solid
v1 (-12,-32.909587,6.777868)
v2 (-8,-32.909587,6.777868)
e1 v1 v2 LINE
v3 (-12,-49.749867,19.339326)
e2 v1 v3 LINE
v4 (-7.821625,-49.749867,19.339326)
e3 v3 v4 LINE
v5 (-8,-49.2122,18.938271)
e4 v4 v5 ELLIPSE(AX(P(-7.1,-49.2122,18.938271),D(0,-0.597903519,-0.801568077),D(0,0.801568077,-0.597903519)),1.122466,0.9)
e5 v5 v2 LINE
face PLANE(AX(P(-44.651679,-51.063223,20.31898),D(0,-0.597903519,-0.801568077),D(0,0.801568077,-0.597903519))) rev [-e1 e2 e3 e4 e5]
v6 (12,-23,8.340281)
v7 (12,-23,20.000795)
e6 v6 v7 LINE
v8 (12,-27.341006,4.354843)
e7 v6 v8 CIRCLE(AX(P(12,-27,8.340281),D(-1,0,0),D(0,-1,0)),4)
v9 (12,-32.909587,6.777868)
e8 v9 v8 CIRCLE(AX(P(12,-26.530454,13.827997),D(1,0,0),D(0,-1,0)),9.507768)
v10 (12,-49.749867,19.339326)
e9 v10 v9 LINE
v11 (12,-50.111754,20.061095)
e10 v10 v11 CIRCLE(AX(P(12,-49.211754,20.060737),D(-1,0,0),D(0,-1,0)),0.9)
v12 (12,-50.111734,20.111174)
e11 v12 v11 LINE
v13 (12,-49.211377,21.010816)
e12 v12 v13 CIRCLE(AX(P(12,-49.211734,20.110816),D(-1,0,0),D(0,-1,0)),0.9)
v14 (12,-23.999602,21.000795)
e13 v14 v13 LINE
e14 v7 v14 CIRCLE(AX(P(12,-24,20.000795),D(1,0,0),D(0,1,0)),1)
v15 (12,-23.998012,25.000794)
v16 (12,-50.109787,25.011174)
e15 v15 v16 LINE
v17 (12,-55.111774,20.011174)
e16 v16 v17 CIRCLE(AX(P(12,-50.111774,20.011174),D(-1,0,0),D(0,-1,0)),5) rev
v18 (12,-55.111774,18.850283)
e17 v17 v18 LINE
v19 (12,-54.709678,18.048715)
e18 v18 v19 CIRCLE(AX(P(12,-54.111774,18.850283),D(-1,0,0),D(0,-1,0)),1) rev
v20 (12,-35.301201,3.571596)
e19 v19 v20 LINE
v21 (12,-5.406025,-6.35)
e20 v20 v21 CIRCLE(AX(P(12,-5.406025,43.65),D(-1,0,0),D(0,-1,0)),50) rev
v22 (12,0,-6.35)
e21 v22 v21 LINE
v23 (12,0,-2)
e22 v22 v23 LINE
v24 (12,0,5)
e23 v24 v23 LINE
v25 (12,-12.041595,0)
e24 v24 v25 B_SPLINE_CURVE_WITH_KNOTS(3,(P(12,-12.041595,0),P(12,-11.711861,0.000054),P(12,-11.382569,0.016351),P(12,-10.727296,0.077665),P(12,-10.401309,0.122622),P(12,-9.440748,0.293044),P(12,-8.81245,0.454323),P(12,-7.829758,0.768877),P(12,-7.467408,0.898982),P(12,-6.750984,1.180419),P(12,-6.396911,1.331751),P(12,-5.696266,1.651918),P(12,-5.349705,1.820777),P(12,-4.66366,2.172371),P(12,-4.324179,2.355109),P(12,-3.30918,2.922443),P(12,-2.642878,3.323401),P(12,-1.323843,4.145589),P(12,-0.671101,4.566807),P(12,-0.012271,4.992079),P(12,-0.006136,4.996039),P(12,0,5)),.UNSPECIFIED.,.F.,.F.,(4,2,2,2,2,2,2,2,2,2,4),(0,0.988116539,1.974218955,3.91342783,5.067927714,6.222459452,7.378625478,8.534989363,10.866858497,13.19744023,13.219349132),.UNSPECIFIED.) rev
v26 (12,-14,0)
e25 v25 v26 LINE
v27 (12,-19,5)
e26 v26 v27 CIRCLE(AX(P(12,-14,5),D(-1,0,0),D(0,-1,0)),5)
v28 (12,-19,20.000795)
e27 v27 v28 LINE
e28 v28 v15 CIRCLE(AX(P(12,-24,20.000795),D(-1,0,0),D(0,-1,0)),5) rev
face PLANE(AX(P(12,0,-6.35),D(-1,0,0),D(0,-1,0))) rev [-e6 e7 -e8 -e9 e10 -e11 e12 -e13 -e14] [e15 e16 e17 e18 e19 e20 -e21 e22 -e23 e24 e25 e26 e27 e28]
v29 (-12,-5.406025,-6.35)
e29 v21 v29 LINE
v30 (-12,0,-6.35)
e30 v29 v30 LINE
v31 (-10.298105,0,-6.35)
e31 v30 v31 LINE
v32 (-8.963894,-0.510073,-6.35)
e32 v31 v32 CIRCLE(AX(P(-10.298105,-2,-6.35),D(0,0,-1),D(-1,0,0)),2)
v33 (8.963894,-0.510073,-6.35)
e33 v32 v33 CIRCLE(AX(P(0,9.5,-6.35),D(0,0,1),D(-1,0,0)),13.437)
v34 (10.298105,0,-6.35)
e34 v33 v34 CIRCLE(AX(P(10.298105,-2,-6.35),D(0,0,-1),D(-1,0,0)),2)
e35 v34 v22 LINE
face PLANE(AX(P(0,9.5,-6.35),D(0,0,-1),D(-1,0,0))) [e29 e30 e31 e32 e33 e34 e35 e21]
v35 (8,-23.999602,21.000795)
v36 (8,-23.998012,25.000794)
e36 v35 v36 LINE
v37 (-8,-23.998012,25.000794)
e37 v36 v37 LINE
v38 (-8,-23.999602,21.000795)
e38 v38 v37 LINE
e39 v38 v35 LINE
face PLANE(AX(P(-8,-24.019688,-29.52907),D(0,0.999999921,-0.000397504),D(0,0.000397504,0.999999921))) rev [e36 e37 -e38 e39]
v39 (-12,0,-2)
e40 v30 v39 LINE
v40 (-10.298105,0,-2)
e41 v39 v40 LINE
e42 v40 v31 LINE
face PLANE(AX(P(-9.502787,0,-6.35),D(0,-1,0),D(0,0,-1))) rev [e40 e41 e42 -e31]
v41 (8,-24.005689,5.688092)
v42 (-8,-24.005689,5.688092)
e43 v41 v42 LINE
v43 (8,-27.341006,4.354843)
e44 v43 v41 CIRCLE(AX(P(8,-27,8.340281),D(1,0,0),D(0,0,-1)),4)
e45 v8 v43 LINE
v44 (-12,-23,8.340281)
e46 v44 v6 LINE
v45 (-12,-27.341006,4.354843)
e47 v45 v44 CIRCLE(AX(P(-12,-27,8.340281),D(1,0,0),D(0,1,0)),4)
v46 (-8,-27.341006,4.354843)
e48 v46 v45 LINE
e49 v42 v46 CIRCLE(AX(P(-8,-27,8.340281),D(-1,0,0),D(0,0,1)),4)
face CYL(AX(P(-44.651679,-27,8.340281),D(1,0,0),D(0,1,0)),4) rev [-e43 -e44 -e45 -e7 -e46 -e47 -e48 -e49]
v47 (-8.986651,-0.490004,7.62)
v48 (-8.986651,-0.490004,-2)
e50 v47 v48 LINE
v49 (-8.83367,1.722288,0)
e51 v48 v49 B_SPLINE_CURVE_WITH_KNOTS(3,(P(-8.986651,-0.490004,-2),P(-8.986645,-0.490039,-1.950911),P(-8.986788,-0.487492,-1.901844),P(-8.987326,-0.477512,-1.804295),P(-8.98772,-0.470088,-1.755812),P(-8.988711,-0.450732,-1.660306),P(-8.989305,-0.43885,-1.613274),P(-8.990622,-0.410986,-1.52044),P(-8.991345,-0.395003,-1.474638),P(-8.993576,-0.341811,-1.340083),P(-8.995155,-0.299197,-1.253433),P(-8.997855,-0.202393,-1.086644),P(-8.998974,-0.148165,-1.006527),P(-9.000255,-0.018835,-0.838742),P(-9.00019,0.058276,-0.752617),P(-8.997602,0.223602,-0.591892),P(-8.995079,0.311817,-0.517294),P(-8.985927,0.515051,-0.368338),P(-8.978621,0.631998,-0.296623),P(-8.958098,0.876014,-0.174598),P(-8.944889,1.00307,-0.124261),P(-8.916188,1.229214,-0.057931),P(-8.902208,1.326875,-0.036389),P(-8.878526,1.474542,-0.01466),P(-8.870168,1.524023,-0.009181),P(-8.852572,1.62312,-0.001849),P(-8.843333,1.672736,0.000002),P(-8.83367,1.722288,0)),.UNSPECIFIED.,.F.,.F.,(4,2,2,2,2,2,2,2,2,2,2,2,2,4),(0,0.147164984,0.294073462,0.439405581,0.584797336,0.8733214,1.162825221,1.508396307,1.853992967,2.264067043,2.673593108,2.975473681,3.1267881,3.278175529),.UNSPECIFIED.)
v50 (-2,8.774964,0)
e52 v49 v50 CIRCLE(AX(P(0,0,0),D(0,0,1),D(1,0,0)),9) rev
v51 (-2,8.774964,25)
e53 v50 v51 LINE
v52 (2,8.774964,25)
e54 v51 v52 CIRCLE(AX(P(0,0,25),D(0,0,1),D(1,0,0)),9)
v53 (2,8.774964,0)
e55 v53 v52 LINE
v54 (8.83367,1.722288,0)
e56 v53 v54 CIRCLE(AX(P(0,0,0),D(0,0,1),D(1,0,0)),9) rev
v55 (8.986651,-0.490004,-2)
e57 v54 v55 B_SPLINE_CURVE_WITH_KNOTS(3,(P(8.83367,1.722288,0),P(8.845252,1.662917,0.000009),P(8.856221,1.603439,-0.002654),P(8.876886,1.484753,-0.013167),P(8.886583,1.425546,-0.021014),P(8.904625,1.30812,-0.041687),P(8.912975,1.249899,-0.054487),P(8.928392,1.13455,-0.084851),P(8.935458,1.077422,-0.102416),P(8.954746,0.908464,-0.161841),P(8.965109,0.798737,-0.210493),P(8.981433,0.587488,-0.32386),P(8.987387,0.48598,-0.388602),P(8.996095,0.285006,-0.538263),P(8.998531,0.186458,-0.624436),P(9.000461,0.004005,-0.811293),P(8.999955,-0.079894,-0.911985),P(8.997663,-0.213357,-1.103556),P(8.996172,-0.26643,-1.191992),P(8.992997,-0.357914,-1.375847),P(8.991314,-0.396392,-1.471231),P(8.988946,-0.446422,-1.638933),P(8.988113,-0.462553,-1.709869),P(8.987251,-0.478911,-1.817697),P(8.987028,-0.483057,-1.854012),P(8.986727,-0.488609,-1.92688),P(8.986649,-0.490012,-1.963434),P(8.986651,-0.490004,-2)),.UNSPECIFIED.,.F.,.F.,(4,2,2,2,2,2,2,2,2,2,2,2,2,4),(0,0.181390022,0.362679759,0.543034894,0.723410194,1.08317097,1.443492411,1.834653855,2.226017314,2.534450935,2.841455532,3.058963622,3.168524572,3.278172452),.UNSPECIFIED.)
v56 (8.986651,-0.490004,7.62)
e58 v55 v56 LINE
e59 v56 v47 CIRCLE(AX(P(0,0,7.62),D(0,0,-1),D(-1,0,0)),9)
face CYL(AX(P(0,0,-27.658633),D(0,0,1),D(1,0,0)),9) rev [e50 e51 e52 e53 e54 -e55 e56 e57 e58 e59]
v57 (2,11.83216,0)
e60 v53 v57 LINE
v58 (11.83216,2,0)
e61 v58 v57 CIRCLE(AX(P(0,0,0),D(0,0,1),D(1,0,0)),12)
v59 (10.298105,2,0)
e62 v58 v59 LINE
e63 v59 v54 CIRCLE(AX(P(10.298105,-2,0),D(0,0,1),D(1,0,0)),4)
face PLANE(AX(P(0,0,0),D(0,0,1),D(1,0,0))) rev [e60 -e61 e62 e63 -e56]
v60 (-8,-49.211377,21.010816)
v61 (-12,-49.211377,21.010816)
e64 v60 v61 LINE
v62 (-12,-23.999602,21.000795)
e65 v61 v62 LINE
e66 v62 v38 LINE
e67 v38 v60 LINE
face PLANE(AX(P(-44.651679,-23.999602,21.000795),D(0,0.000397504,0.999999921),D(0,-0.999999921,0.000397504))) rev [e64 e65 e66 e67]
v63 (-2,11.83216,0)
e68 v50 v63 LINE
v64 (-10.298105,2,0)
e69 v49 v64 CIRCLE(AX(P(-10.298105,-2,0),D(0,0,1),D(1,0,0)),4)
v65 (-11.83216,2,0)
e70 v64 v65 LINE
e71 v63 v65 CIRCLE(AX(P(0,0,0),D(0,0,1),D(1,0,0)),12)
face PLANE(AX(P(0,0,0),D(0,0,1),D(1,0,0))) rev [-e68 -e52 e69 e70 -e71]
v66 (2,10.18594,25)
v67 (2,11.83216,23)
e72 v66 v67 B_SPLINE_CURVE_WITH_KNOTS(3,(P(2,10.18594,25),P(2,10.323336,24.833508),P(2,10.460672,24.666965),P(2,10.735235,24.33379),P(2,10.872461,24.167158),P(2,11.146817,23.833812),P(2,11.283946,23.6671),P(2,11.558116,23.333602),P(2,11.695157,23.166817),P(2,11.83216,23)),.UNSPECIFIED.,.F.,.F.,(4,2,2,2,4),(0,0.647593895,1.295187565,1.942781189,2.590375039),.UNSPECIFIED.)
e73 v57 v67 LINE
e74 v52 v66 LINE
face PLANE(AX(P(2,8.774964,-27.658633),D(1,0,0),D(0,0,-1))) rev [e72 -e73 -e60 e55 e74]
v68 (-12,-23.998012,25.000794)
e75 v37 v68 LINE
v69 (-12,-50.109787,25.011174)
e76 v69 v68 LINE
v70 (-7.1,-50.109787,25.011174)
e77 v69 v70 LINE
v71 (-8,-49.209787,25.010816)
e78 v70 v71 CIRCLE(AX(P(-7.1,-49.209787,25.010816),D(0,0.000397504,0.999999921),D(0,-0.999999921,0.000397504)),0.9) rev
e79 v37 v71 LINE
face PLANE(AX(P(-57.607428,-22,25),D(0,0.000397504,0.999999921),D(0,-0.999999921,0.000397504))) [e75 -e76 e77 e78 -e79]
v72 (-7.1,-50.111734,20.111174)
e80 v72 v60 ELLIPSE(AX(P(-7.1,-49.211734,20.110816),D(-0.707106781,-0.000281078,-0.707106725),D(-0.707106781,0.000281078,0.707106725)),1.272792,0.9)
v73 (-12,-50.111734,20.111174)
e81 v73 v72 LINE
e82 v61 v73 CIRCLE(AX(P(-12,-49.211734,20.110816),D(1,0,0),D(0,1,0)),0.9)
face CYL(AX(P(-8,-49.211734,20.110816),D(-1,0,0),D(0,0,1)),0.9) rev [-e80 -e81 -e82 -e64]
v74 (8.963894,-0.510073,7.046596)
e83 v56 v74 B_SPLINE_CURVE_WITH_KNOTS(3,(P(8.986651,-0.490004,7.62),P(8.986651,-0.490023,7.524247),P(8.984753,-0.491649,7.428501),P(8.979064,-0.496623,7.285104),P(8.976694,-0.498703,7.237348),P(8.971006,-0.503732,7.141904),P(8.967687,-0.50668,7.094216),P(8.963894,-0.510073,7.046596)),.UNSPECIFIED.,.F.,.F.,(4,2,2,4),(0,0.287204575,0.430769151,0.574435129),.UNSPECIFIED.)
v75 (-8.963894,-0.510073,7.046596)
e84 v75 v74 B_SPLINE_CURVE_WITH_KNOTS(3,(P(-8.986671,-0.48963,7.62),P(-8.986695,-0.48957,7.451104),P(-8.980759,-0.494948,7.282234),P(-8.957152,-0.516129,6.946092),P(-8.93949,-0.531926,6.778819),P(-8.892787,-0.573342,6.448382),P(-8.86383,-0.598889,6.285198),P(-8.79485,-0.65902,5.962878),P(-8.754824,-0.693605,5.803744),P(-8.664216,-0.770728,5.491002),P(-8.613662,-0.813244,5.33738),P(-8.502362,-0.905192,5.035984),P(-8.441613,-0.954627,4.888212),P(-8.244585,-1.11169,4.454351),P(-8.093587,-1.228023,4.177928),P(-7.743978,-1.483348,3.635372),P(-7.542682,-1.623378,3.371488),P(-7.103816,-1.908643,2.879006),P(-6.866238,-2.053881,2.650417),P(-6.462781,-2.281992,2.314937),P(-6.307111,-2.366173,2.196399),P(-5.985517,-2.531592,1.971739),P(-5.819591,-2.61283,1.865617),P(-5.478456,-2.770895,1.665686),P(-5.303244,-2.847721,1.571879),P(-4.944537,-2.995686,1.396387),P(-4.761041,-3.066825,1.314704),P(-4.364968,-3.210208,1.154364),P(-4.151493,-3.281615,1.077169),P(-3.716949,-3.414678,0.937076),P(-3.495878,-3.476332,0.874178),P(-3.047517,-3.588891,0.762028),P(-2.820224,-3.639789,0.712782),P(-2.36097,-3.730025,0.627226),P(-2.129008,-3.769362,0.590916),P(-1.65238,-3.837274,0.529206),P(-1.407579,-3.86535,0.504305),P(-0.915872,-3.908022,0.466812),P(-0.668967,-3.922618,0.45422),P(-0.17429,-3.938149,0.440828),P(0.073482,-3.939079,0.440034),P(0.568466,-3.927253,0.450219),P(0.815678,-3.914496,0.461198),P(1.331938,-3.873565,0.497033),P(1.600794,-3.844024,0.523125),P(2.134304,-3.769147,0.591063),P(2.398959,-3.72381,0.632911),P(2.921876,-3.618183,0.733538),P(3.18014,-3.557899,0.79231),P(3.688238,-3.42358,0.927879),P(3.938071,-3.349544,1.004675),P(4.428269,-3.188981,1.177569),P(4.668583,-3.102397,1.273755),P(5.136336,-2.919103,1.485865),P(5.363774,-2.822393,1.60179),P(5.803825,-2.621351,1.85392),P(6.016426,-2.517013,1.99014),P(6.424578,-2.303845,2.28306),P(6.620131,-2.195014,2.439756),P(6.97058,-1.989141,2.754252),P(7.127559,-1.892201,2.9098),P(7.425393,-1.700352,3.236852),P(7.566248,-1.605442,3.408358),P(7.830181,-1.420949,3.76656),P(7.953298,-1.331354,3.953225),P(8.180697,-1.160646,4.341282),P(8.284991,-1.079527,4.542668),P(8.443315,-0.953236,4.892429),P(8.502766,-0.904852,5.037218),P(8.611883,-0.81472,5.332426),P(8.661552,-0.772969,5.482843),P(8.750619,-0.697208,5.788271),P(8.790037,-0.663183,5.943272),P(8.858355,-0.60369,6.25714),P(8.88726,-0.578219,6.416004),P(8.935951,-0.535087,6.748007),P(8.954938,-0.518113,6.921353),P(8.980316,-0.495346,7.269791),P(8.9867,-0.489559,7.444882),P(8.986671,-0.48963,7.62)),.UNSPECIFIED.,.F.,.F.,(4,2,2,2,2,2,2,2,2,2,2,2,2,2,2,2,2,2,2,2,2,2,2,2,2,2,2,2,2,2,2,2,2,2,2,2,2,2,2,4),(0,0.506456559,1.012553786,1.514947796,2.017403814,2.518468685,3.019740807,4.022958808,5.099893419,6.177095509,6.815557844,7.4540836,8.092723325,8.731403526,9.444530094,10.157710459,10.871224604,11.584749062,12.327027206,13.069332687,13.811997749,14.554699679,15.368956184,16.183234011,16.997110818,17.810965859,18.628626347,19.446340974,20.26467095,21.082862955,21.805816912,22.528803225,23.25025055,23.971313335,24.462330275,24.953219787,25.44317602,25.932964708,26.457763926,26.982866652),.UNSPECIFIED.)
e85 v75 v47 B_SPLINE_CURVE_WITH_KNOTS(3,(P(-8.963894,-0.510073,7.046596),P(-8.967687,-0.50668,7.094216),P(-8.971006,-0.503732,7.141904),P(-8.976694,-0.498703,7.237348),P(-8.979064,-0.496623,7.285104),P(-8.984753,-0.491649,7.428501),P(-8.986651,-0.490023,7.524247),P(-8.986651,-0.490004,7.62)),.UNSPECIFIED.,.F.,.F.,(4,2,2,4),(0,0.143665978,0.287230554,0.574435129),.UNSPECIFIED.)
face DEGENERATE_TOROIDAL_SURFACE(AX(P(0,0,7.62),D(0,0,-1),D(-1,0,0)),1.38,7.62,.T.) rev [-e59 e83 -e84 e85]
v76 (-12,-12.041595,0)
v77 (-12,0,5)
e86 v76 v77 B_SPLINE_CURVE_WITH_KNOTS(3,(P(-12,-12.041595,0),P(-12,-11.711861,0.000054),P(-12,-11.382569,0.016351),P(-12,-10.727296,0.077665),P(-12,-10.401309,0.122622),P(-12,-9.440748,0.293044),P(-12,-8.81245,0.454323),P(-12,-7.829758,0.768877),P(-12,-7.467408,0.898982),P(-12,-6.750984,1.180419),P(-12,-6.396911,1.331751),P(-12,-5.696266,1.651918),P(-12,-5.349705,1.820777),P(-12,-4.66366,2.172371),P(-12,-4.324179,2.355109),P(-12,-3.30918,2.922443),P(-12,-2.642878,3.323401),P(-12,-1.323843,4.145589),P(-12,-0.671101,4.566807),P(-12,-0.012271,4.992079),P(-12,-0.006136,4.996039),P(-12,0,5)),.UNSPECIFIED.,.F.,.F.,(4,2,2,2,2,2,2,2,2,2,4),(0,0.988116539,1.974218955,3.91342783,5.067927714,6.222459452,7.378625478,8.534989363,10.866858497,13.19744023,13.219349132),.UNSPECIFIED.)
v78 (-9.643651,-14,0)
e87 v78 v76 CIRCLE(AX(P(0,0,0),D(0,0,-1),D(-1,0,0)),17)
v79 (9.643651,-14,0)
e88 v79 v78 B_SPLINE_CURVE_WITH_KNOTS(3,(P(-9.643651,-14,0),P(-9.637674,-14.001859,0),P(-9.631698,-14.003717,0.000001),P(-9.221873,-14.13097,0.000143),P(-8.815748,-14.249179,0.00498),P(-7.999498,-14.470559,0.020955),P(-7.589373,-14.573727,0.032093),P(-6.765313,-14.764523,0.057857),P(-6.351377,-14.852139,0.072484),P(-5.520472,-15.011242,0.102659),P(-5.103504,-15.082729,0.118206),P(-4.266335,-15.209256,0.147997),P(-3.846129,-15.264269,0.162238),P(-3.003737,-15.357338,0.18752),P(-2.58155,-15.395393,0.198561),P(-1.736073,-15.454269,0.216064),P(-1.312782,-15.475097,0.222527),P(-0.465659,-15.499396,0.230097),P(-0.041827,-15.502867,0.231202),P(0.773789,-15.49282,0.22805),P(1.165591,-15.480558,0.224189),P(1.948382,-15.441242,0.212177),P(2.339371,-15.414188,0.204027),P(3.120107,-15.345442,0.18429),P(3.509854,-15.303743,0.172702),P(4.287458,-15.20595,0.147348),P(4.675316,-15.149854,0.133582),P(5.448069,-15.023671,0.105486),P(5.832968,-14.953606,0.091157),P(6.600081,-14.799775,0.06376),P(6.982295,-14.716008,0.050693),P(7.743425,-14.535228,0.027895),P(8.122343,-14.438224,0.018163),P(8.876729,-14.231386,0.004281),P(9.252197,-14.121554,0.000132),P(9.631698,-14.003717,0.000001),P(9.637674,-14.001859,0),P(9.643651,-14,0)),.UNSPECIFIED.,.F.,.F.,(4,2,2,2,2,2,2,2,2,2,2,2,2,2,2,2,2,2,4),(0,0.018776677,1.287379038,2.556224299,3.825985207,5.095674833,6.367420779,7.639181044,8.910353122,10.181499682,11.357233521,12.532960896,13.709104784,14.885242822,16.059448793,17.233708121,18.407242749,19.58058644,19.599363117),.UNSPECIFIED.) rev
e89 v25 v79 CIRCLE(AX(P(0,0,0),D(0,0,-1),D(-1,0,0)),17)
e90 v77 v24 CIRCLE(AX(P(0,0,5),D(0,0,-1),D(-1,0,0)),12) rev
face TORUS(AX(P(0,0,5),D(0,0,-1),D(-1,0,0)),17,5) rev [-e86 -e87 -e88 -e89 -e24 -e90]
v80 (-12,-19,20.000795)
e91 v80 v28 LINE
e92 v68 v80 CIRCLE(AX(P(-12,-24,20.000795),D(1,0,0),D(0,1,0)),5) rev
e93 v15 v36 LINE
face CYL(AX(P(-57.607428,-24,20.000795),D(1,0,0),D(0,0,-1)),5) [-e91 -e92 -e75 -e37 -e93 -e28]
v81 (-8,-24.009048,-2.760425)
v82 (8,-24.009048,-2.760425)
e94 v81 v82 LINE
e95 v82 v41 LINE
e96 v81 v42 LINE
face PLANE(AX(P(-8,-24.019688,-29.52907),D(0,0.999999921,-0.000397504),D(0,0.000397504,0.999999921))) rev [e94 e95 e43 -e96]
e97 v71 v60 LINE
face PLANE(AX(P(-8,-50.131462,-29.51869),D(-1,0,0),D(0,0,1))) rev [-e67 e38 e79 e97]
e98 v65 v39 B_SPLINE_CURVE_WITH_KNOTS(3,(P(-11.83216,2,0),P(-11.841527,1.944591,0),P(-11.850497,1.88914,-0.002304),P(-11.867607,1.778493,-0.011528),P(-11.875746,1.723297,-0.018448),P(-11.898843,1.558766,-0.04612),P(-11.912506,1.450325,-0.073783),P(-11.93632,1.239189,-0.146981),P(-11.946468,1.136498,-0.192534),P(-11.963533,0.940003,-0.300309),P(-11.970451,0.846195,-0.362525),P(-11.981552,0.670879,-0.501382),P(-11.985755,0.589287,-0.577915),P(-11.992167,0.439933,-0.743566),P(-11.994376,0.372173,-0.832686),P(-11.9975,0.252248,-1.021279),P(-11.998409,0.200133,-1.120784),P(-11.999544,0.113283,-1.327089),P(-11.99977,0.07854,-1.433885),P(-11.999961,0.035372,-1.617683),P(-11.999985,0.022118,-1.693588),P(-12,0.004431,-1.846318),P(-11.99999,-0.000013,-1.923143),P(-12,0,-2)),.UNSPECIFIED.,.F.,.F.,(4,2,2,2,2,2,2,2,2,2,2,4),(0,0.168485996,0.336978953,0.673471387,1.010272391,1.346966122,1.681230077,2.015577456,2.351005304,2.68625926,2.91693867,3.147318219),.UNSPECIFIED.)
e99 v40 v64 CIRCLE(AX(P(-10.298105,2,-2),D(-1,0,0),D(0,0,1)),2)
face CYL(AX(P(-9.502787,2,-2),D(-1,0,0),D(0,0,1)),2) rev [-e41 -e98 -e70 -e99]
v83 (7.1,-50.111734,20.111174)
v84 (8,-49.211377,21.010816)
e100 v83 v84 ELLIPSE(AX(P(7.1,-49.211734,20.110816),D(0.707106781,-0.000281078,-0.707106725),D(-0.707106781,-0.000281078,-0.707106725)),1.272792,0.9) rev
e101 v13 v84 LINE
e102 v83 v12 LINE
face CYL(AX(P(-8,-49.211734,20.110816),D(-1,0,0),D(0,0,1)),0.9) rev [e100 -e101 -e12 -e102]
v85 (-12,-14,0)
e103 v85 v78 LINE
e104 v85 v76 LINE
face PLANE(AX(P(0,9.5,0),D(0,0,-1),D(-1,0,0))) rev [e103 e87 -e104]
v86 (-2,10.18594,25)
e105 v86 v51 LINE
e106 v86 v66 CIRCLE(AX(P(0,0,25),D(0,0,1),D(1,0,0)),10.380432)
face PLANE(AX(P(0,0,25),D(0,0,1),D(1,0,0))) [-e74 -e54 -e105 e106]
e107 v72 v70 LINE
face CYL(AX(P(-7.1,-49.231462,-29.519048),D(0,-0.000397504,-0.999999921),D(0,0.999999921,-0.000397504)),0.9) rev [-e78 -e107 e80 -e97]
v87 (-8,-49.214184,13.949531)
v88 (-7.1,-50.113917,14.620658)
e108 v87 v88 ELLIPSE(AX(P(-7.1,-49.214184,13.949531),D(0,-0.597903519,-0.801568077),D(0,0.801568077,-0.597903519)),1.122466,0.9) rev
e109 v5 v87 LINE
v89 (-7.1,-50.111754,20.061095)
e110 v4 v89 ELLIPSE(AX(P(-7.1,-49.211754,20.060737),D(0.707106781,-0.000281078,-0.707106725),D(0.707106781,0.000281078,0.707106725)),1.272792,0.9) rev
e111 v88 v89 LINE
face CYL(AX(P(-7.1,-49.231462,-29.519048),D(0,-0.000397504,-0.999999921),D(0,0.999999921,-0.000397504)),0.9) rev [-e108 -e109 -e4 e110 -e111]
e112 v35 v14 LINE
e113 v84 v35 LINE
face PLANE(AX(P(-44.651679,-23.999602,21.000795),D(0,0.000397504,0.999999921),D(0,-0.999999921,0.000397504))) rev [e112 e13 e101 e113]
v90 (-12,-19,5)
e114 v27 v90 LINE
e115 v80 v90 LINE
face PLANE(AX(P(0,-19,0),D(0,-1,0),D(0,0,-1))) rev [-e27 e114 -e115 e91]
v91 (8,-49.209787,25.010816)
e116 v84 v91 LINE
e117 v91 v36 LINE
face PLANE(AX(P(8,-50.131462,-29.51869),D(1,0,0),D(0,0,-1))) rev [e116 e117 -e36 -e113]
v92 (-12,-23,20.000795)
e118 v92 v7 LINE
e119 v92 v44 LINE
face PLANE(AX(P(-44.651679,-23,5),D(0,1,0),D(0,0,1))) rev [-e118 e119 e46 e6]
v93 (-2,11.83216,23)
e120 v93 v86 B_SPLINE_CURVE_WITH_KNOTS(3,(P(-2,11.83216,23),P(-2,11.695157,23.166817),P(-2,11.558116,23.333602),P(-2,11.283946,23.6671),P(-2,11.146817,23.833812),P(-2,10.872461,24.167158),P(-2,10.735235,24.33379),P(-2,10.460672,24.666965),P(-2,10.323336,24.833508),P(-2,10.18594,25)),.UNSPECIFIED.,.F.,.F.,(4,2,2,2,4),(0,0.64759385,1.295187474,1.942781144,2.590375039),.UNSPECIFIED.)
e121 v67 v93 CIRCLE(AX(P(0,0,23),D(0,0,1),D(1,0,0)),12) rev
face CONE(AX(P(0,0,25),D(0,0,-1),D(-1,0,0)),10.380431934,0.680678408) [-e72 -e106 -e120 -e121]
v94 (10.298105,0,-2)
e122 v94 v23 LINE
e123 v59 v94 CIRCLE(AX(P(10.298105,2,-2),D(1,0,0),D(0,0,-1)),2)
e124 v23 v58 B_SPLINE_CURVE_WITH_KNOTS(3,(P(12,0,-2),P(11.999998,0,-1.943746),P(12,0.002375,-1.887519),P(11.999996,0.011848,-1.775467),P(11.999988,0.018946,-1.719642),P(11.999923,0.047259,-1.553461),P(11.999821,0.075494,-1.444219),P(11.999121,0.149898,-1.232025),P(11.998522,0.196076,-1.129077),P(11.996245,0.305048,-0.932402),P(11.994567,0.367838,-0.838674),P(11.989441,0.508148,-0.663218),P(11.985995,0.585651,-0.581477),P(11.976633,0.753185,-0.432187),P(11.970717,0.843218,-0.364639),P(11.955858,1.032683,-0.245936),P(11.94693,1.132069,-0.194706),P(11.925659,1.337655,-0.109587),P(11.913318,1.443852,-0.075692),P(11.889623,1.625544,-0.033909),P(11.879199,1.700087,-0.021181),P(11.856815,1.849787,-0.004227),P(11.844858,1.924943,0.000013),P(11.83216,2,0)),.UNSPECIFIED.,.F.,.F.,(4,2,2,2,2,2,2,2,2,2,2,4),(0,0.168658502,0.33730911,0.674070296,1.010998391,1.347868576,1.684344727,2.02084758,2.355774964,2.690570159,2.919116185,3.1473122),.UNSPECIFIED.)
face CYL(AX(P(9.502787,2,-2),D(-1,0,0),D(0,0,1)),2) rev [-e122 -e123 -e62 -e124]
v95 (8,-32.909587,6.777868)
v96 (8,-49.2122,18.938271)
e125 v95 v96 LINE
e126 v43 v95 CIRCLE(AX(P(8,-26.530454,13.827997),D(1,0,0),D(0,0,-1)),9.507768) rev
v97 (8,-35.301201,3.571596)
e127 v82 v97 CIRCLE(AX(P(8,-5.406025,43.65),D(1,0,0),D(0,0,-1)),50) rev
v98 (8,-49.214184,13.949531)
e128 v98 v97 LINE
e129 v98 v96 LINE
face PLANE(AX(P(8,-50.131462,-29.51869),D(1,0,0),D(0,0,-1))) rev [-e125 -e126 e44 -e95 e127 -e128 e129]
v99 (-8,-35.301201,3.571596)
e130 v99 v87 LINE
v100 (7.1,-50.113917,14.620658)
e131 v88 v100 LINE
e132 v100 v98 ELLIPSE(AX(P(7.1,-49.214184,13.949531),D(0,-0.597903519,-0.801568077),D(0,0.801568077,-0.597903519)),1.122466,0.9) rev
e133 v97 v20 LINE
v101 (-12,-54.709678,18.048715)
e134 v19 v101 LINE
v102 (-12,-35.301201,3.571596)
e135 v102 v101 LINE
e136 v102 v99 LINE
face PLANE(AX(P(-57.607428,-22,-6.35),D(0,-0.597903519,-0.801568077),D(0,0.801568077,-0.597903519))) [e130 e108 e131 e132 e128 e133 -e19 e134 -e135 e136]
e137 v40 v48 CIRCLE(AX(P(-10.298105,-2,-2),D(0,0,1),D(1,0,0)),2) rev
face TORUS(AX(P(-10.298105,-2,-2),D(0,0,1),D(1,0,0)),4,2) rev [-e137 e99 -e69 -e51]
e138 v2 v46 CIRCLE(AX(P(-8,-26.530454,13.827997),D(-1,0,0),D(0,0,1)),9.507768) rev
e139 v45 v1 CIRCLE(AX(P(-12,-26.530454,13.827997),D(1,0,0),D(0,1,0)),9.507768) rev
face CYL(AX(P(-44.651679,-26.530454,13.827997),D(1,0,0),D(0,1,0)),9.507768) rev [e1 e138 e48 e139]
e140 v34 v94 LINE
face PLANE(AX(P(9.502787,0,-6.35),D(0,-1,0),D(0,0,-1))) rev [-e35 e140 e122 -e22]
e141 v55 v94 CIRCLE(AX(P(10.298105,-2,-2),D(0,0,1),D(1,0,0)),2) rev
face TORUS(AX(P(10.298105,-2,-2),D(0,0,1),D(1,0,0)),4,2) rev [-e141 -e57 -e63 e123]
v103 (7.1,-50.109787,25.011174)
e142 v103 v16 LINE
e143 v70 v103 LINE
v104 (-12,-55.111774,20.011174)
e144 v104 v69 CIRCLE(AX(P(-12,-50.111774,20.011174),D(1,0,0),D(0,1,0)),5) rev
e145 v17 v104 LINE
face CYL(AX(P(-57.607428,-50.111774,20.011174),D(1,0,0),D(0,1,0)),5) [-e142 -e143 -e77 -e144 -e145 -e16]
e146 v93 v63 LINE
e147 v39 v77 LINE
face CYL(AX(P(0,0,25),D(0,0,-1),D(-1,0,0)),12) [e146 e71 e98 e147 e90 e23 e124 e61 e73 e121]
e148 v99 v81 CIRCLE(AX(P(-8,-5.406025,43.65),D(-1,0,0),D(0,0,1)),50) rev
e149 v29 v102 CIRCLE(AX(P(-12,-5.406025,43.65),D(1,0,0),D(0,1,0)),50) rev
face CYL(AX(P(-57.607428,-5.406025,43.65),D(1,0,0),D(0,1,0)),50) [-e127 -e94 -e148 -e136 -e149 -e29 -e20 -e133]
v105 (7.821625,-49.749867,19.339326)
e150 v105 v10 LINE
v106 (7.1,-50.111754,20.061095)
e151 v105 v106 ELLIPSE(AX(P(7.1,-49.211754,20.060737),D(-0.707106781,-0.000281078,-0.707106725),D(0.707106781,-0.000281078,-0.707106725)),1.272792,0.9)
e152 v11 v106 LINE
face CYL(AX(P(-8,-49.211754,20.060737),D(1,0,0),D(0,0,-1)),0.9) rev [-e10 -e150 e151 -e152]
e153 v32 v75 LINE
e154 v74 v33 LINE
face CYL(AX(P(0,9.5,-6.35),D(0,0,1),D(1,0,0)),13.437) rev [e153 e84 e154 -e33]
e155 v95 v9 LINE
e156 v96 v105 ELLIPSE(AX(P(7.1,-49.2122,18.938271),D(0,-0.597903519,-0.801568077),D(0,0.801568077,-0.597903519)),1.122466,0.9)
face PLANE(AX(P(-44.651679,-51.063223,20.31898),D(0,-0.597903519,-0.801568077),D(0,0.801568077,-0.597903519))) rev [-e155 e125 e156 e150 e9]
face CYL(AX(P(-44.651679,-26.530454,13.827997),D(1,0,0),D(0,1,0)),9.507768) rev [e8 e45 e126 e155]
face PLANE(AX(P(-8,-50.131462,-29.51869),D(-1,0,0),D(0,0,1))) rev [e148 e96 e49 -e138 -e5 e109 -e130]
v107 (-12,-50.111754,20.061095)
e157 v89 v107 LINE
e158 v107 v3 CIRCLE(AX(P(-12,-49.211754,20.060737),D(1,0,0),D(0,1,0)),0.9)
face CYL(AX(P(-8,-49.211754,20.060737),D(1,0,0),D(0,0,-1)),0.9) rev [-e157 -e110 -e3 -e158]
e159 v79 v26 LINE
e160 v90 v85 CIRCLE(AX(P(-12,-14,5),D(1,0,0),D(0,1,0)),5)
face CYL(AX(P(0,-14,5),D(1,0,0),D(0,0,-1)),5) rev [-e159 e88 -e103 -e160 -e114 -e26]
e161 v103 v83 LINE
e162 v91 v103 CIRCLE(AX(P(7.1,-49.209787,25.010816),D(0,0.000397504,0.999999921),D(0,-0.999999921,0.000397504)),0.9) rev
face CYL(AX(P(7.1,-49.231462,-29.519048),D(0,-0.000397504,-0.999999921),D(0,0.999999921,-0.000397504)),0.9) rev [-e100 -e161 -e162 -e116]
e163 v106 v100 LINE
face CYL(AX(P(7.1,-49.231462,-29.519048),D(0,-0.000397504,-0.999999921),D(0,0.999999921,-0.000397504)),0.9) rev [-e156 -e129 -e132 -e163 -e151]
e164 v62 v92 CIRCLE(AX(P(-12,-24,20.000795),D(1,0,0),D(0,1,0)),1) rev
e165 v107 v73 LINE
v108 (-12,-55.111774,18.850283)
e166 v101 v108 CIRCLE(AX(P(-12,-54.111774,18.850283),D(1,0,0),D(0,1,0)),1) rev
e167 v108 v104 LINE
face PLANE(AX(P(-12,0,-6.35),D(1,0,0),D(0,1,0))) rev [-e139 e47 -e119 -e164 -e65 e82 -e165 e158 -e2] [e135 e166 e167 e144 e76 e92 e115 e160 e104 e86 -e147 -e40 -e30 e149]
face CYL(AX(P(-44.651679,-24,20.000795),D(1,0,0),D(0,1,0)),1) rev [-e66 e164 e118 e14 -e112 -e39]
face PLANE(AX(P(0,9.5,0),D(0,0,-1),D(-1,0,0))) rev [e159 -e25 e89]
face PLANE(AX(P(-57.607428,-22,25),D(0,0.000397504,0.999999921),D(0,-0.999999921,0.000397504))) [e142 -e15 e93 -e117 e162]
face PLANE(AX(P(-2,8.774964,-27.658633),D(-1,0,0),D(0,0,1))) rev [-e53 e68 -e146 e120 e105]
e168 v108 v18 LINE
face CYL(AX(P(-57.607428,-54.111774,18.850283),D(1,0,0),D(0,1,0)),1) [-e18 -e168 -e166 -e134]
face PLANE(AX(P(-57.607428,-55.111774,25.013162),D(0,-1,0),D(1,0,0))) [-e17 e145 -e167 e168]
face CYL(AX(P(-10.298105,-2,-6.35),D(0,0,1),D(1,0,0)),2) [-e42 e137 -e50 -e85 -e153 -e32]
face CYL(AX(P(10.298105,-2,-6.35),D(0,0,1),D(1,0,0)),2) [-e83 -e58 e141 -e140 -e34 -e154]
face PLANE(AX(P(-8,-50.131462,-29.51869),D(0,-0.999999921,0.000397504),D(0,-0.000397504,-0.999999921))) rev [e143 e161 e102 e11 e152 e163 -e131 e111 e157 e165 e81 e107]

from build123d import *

# Parameters (mm, degrees)
SKETCH1_R           = 12
BOSS_EXTRUDE1_DEPTH = 25
CUT_EXTRUDE1_DEPTH  = 25
BOSS_EXTRUDE2_DEPTH = 6.35
FILLET1_R           = 7.62
CHAMFER1_SIZE       = 2
CHAMFER1_SIZE2      = 1.6195680663900194
BOSS_EXTRUDE3_DEPTH = 3
BOSS_EXTRUDE4_DEPTH = 24
FILLET3_R           = 50
FILLET7_R           = 5
FILLET8_R           = 5
FILLET9_R           = 5
CUT_EXTRUDE2_DEPTH  = 24
FILLET10_R          = 1
FILLET12_R          = 2
FILLET13_R          = 2
CUT_EXTRUDE3_REACH  = 66.534
SKETCH9_W           = 16.00000000000001
SKETCH9_H           = 26.111776117406702
FILLET15_R          = 4
BOSS_EXTRUDE5_REACH = 69.872
FILLET16_R          = 0.9


with BuildPart() as part:
    # Sketch1 → Boss-Extrude1 (new body)
    with BuildSketch(Plane.XY):
        Circle(SKETCH1_R)
    extrude(amount=BOSS_EXTRUDE1_DEPTH)

    # Sketch2 → Cut-Extrude1 (cut)
    with BuildSketch(Plane.XY.offset(25)):
        with BuildLine():
            Line((-2, 12), (2, 12))
            Line((2, 12), (2, 8.77496438739212))
            ThreePointArc((2, 8.77496438739212), (-1.65e-15, -8.999999999999998), (-2, 8.77496438739212))
            Line((-2, 8.77496438739212), (-2, 12))
        make_face()
    extrude(amount=-CUT_EXTRUDE1_DEPTH, mode=Mode.SUBTRACT)

    # Sketch3 → Boss-Extrude2 (add)
    with BuildSketch(Plane(origin=(0, 0, 0), x_dir=(-1, 0, 0), z_dir=(0, 0, -1))):
        with BuildLine():
            Line((-9.50278743316929, 0), (-12.000000000000002, 0))
            Line((-12.000000000000002, 0), (-12.000000000000004, -19))
            Line((-12.000000000000004, -19), (12.000000000000004, -19))
            Line((12.000000000000004, -19), (12.000000000000002, 0))
            Line((12.000000000000002, 0), (9.50278743316929, 0))
            ThreePointArc((9.50278743316929, 0), (8.2e-16, -3.9369999999999994), (-9.50278743316929, 0))
        make_face()
    extrude(amount=BOSS_EXTRUDE2_DEPTH)

    # Fillet1
    # the kernel refuses this fillet: 7.62 mm, written as the material it adds along each edge
    with BuildSketch(Plane(origin=(-8.3e-16, 4.2e-16, 0), x_dir=(0.0031415874858799547, 0.9999950652018581, 0), z_dir=(-0.9999950652018581, 0.0031415874858799547, 0))) as fillet1_piece_1_section:
        with BuildLine():
            CenterArc((8.999999999999998 - FILLET1_R, -FILLET1_R), FILLET1_R, 0, 89.99999999999999)
            Line((8.999999999999998 - FILLET1_R, 2.66e-15), (8.999999999999998, 0))
            Line((8.999999999999998, 0), (8.999999999999996, -FILLET1_R))
        make_face()
    fillet1_piece_1 = revolve(axis=Axis((-8.3e-16, 4.2e-16, 0), (0, 0, -1)), revolution_arc=359.64, mode=Mode.PRIVATE)
    fillet1_piece_1 = fillet1_piece_1 - Plane(origin=(0, 9.500000000000028, 1.752978238820399), x_dir=(-0.7072104958822112, -0.7070030512763273, 0), z_dir=(0, 0, 1)) * Cylinder(13.437000000000028, 36, mode=Mode.PRIVATE)
    add(fillet1_piece_1)

    # Chamfer1
    chamfer1_edges = [part.edges().sort_by_distance(p)[0] for p in [
        (-1.0525e-13, -12, 25),
    ]]
    chamfer1_side = [part.faces().sort_by_distance(p)[0] for p in [
        (-2.2e-15, -12, 12.5),
    ]]
    chamfer(chamfer1_edges, length=CHAMFER1_SIZE, length2=CHAMFER1_SIZE2, reference=chamfer1_side[0])

    # Sketch6 → Boss-Extrude3 (add)
    with BuildSketch(Plane.XZ.offset(19)):
        Polygon((-12.000000000000007, 25), (-12.000000000000005, -6.35), (12.000000000000005, -6.35), (12.000000000000004, 25.00000000000001), align=None)
    extrude(amount=BOSS_EXTRUDE3_DEPTH)

    # Sketch7 → Boss-Extrude4 (add)
    with BuildSketch(Plane(origin=(12.000000000000002, 1.1e-15, 0), x_dir=(0, 0, -1), z_dir=(1, 1.9e-16, 0))):
        Polygon((-25.00000000000001, -22.000000000000004), (6.35, -22.000000000000004), (-18.348646063087493, -55.11177405445072), (-25.013162071560505, -55.11177405445072), align=None)
    extrude(amount=-BOSS_EXTRUDE4_DEPTH)

    # Fillet3
    fillet3_edges = [part.edges().sort_by_distance(p)[0] for p in [
        (0, -22, -6.35),
    ]]
    fillet(fillet3_edges, radius=FILLET3_R)

    # Fillet7
    # the kernel refuses this fillet: 5 mm, written as the material it adds along each edge
    with BuildSketch(Plane(origin=(0, 0, 0), x_dir=(-1, 6e-17, 0), z_dir=(6e-17, 1, 0))) as fillet7_piece_1_section:
        with BuildLine():
            CenterArc((12.000000000000002 + FILLET7_R, FILLET7_R), FILLET7_R, 180, 90)
            Line((12, FILLET7_R), (12.000000000000002, 0))
            Line((12.000000000000002, 0), (12.000000000000002 + FILLET7_R, 0))
        make_face()
    fillet7_piece_1 = revolve(axis=Axis((0, 0, 0), (0, 0, 1)), revolution_arc=179.99999999999997, mode=Mode.PRIVATE)
    fillet7_piece_1 = split(fillet7_piece_1, bisect_by=Plane(origin=(12.000000000000004, -12.055106327045037, 2.4999999999999996), z_dir=(-1, -9e-17, 0)), keep=Keep.TOP, mode=Mode.PRIVATE)
    fillet7_piece_1 = split(fillet7_piece_1, bisect_by=Plane(origin=(-12.000000000000004, -12.055106327045038, 2.4999999999999996), z_dir=(1, -9e-17, 0)), keep=Keep.TOP, mode=Mode.PRIVATE)
    add(fillet7_piece_1)
    with BuildSketch(Plane(origin=(12.000000000000004, -19, 0), x_dir=(0, 1, 0), z_dir=(-1, 0, 0))) as fillet7_piece_2:
        with BuildLine():
            CenterArc((FILLET7_R, -FILLET7_R), FILLET7_R, 90, 90)
            Line((0, -FILLET7_R), (0, 0))
            Line((0, 0), (FILLET7_R, 0))
        make_face()
    extrude(amount=24.000000000000007)

    # Fillet8
    fillet8_edges = [part.edges().sort_by_distance(p)[0] for p in [
        (1.243e-14, -55.11177405445072, 25.013162071560505),
    ]]
    fillet(fillet8_edges, radius=FILLET8_R)

    # Fillet9
    fillet9_edges = [part.edges().sort_by_distance(p)[0] for p in [
        (-1.78e-15, -19, 25.000000000000007),
    ]]
    fillet(fillet9_edges, radius=FILLET9_R)

    # Sketch8 → Cut-Extrude2 (cut)
    with BuildSketch(Plane(origin=(12.000000000000002, 1.1e-15, 0), x_dir=(0, 0, -1), z_dir=(1, 1.9e-16, 0))):
        with BuildLine():
            Line((-4.999999999999998, -23), (-20.000794613515104, -23.000000000000004))
            ThreePointArc((-20.000794613515104, -23.000000000000004), (-20.70776084176148, -23.292752693805703), (-21.000794534510295, -23.999602495761817))
            Line((-21.000794534510295, -23.999602495761817), (-21.011174076183625, -50.11137655021254))
            ThreePointArc((-21.011174076183625, -50.11137655021254), (-20.819933843558175, -50.699913295165096), (-20.318980441541633, -51.06322310199948))
            Line((-20.318980441541633, -51.06322310199948), (-6.777868461008763, -32.90958669617576))
            ThreePointArc((-6.777868461008763, -32.90958669617576), (-4.469648137926145, -28.20942596380706), (-4.999999999999998, -23))
        make_face()
    extrude(amount=-CUT_EXTRUDE2_DEPTH, mode=Mode.SUBTRACT)

    # Fillet10
    fillet10_edges = [part.edges().sort_by_distance(p)[0] for p in [
        (1.243e-14, -55.11177405445072, 18.348646063087493),
    ]]
    fillet(fillet10_edges, radius=FILLET10_R)

    # Fillet12
    fillet12_edges = [part.edges().sort_by_distance(p)[0] for p in [
        (-9.502787433169292, -8.9e-16, -3.175),
        (9.502787433169292, -8.9e-16, -3.175),
    ]]
    fillet(fillet12_edges, radius=FILLET12_R)

    # Fillet13
    # the kernel refuses this fillet: 2 mm, written as the material it adds along each edge
    with BuildSketch(Plane(origin=(10.298105116962052, 0, 0), x_dir=(0, 0, -1), z_dir=(1, 0, 0))) as fillet13_piece_1_section:
        with BuildLine():
            CenterArc((FILLET13_R, FILLET13_R), FILLET13_R, 180, 90)
            Line((-2.2e-16, FILLET13_R), (0, 0))
            Line((0, 0), (FILLET13_R, 0))
        make_face()
    fillet13_piece_1 = extrude(amount=6.701894883037948, mode=Mode.PRIVATE)
    fillet13_piece_1 = fillet13_piece_1 & Plane(origin=(0, 0, -0.44903446636731825), x_dir=(1, 0, 0), z_dir=(0, 0, -1)) * Cylinder(12, 22, mode=Mode.PRIVATE)
    add(fillet13_piece_1)
    with BuildSketch(Plane(origin=(-10.298105116962049, -2, 0), x_dir=(-0.07369380939887726, -0.9972809145152042, 0), z_dir=(-0.9972809145152042, 0.07369380939887726, 0))) as fillet13_piece_2_section:
        with BuildLine():
            CenterArc((2.0000000000000004 + FILLET13_R, -FILLET13_R), FILLET13_R, 89.99999999999997, 90)
            Line((2.0000000000000004 + FILLET13_R, 2.2e-16), (2.0000000000000004, 0))
            Line((2.0000000000000004, 0), (2, -FILLET13_R))
        make_face()
    fillet13_piece_2 = revolve(axis=Axis((-10.298105116962049, -2, 0), (0, 0, 1)), revolution_arc=184.22617539365706, mode=Mode.PRIVATE)
    fillet13_piece_2 = fillet13_piece_2 - Plane(origin=(-8.3e-16, 4.2e-16, -0.6407272575669332), x_dir=(0.22222222222222238, 0.9749960430435691, 0), z_dir=(0, 0, 1)) * Cylinder(8.999999999999998, 17, mode=Mode.PRIVATE)
    add(fillet13_piece_2)
    with BuildSketch(Plane(origin=(10.298105116962052, -2, 0), x_dir=(0, 1, 0), z_dir=(1, 0, 0))) as fillet13_piece_3_section:
        with BuildLine():
            CenterArc((2 + FILLET13_R, -FILLET13_R), FILLET13_R, 90, 90)
            Line((2 + FILLET13_R, 2.2e-16), (2, 0))
            Line((2, 0), (2, -FILLET13_R))
        make_face()
    fillet13_piece_3 = revolve(axis=Axis((10.298105116962052, -2, 0), (0, 0, 1)), revolution_arc=184.22617539365754, mode=Mode.PRIVATE)
    fillet13_piece_3 = fillet13_piece_3 - Plane(origin=(-8.3e-16, 4.2e-16, -0.8153326958488982), x_dir=(0.22222222222222238, 0.9749960430435691, 0), z_dir=(0, 0, 1)) * Cylinder(8.999999999999998, 16, mode=Mode.PRIVATE)
    add(fillet13_piece_3)
    with BuildSketch(Plane(origin=(-17, 0, 0), x_dir=(0, 0, -1), z_dir=(1, 0, 0))) as fillet13_piece_4_section:
        with BuildLine():
            CenterArc((FILLET13_R, FILLET13_R), FILLET13_R, 180, 90)
            Line((-2.2e-16, FILLET13_R), (0, 0))
            Line((0, 0), (FILLET13_R, 0))
        make_face()
    fillet13_piece_4 = extrude(amount=6.7018948830379514, mode=Mode.PRIVATE)
    fillet13_piece_4 = fillet13_piece_4 & Plane(origin=(0, 0, -0.4490342356486683), x_dir=(1, 0, 0), z_dir=(0, 0, -1)) * Cylinder(12, 22, mode=Mode.PRIVATE)
    add(fillet13_piece_4)

    # Cut-Extrude3: up to this plane
    cut_extrude3_end = Plane(origin=(-57.60742830022284, -22.000000000000018, -6.35), z_dir=(0, -0.5979035190056836, -0.8015680769345921))
    # Sketch9 → Cut-Extrude3 (cut, up to the surface)
    with BuildSketch(Plane(origin=(0, 0.00993412895799998, 24.991250957210262), x_dir=(1, 0, 0), z_dir=(0, 0.0003975042381898005, 0.9999999209951873)), mode=Mode.PRIVATE) as cut_extrude3_sk1:
        with Locations((0, -37.06383656321388)):
            Rectangle(SKETCH9_W, SKETCH9_H)
    cut_extrude3_tool1 = split(extrude(cut_extrude3_sk1.sketch, amount=-CUT_EXTRUDE3_REACH, mode=Mode.PRIVATE), bisect_by=cut_extrude3_end, keep=Keep.BOTH, mode=Mode.PRIVATE)
    add(cut_extrude3_tool1.solids().sort_by_distance((0, -37.0539, 25.005984))[0], mode=Mode.SUBTRACT)

    # Fillet15
    # the kernel refuses this fillet: 4 mm, written as the material it adds along each edge
    with BuildSketch(Plane(origin=(12.000000000000007, -23, 4.999999999999999), x_dir=(0, 0, 1), z_dir=(-1, -1.9e-16, 0))) as fillet15_piece_1_section:
        with BuildLine():
            CenterArc((3.3402809515369762, -4), FILLET15_R, 89.99999999999997, 94.89048853854479)
            ThreePointArc((-0.6451568973076123, -4.341006089384081), (-0.5764760987946635, -2.1327689764079274), (0, 0))
            Line((0, 0), (3.340280951536978, 0))
        make_face()
    fillet15_piece_1 = extrude(amount=24, mode=Mode.PRIVATE)
    fillet15_piece_1 = split(fillet15_piece_1, bisect_by=Plane(origin=(10.00000000000001, -24.005623928158137, 5.852699641182596), z_dir=(0, 0.9999999209951872, -0.0003975042381898005)), keep=Keep.TOP, mode=Mode.PRIVATE)
    fillet15_piece_1 = split(fillet15_piece_1, bisect_by=Plane(origin=(8.000000000000005, -23.36055913801038, 5.852443225174341), z_dir=(1, 0, 0)), keep=Keep.TOP, mode=Mode.PRIVATE)
    add(fillet15_piece_1)
    with BuildSketch(Plane(origin=(12.000000000000007, -23, 4.999999999999999), x_dir=(0, 0, 1), z_dir=(-1, -1.9e-16, 0))) as fillet15_piece_2_section:
        with BuildLine():
            CenterArc((3.3402809515369762, -4), FILLET15_R, 89.99999999999997, 94.89048853854479)
            ThreePointArc((-0.6451568973076123, -4.341006089384081), (-0.5764760987946635, -2.1327689764079274), (0, 0))
            Line((0, 0), (3.340280951536978, 0))
        make_face()
    fillet15_piece_2 = extrude(amount=24, mode=Mode.PRIVATE)
    fillet15_piece_2 = split(fillet15_piece_2, bisect_by=Plane(origin=(9.999999999999982, -24.006080855539047, 4.703209142937297), z_dir=(0, -0.9999999209951872, 0.0003975042381898005)), keep=Keep.TOP, mode=Mode.PRIVATE)
    fillet15_piece_2 = split(fillet15_piece_2, bisect_by=Plane(origin=(8.000000000000005, -24.979834026786314, 4.7035962139803935), z_dir=(1, 0, 0)), keep=Keep.TOP, mode=Mode.PRIVATE)
    add(fillet15_piece_2)
    with BuildSketch(Plane(origin=(12.000000000000007, -23, 4.999999999999999), x_dir=(0, 0, 1), z_dir=(-1, -1.9e-16, 0))) as fillet15_piece_3_section:
        with BuildLine():
            CenterArc((3.3402809515369762, -4), FILLET15_R, 89.99999999999997, 94.89048853854479)
            ThreePointArc((-0.6451568973076123, -4.341006089384081), (-0.5764760987946635, -2.1327689764079274), (0, 0))
            Line((0, 0), (3.340280951536978, 0))
        make_face()
    fillet15_piece_3 = extrude(amount=24, mode=Mode.PRIVATE)
    fillet15_piece_3 = split(fillet15_piece_3, bisect_by=Plane(origin=(-8.000000000000005, -23.360559138010377, 5.852443225174337), z_dir=(1, 0, 0)), keep=Keep.TOP, mode=Mode.PRIVATE)
    fillet15_piece_3 = split(fillet15_piece_3, bisect_by=Plane(origin=(-1.954e-14, -24.005623928158137, 5.852699641182593), z_dir=(0, 0.9999999209951872, -0.0003975042381898005)), keep=Keep.TOP, mode=Mode.PRIVATE)
    fillet15_piece_3 = split(fillet15_piece_3, bisect_by=Plane(origin=(8.000000000000005, -23.36055913801037, 5.852443225174337), z_dir=(-1, 0, 0)), keep=Keep.TOP, mode=Mode.PRIVATE)
    add(fillet15_piece_3)
    with BuildSketch(Plane(origin=(12.000000000000007, -23, 4.999999999999999), x_dir=(0, 0, 1), z_dir=(-1, -1.9e-16, 0))) as fillet15_piece_4_section:
        with BuildLine():
            CenterArc((3.3402809515369762, -4), FILLET15_R, 89.99999999999997, 94.89048853854479)
            ThreePointArc((-0.6451568973076123, -4.341006089384081), (-0.5764760987946635, -2.1327689764079274), (0, 0))
            Line((0, 0), (3.340280951536978, 0))
        make_face()
    fillet15_piece_4 = extrude(amount=24, mode=Mode.PRIVATE)
    fillet15_piece_4 = split(fillet15_piece_4, bisect_by=Plane(origin=(-8.000000000000005, -23.360559138010377, 5.852443225174341), z_dir=(-1, 0, 0)), keep=Keep.TOP, mode=Mode.PRIVATE)
    fillet15_piece_4 = split(fillet15_piece_4, bisect_by=Plane(origin=(-10.000000000000002, -24.005623928158137, 5.852699641182593), z_dir=(0, 0.9999999209951872, -0.0003975042381898005)), keep=Keep.TOP, mode=Mode.PRIVATE)
    add(fillet15_piece_4)
    with BuildSketch(Plane(origin=(12.000000000000007, -23, 4.999999999999999), x_dir=(0, 0, 1), z_dir=(-1, -1.9e-16, 0))) as fillet15_piece_5_section:
        with BuildLine():
            CenterArc((3.3402809515369762, -4), FILLET15_R, 89.99999999999997, 94.89048853854479)
            ThreePointArc((-0.6451568973076123, -4.341006089384081), (-0.5764760987946635, -2.1327689764079274), (0, 0))
            Line((0, 0), (3.340280951536978, 0))
        make_face()
    fillet15_piece_5 = extrude(amount=24, mode=Mode.PRIVATE)
    fillet15_piece_5 = split(fillet15_piece_5, bisect_by=Plane(origin=(-8.000000000000005, -24.979834026786307, 4.70359621398039), z_dir=(-1, 0, 0)), keep=Keep.TOP, mode=Mode.PRIVATE)
    fillet15_piece_5 = split(fillet15_piece_5, bisect_by=Plane(origin=(-10.000000000000002, -24.006080855539047, 4.703209142937293), z_dir=(0, -0.9999999209951872, 0.0003975042381898005)), keep=Keep.TOP, mode=Mode.PRIVATE)
    add(fillet15_piece_5)

    # Sketch10 → Boss-Extrude5 (add, up to next)
    with BuildSketch(Plane(origin=(0, -50.1197206622178, 0.01992280295411781), x_dir=(1, 0, 0), z_dir=(0, 0.9999999209951873, -0.00039750423818980053)), mode=Mode.PRIVATE) as boss_extrude5_sk1:
        Polygon((-12.00000000000001, -19.589475982962057), (12.00000000000001, -19.589475982962057), (12.000000000000012, -20.99125293163952), (-12.000000000000005, -20.99125293163952), align=None)
    boss_extrude5_tool1 = extrude(boss_extrude5_sk1.sketch, amount=-BOSS_EXTRUDE5_REACH, mode=Mode.PRIVATE) - part.part
    add(boss_extrude5_tool1.solids().sort_by_distance((0, -50.111655, 20.310286))[0])

    # Fillet16
    fillet16_edges = [part.edges().sort_by_distance(p)[0] for p in [
        (-9.999999999999996, -50.11137655021255, 21.01117407618362),
        (10.000000000000007, -50.11137655021254, 21.01117407618362),
        (8.000000000000005, -50.11292528511694, 17.1150274864303),
        (8.000000000000005, -50.11058154173617, 23.011173918174002),
        (-8.000000000000005, -50.11292528511694, 17.115027486430296),
        (-8.000000000000005, -50.11058154173617, 23.011173918174002),
        (10.000000000000007, -50.11193376249066, 19.609397238253294),
        (-10.000000000000007, -50.11193376249066, 19.609397238253294),
    ]]
    fillet(fillet16_edges, radius=FILLET16_R)


solid = part.part
